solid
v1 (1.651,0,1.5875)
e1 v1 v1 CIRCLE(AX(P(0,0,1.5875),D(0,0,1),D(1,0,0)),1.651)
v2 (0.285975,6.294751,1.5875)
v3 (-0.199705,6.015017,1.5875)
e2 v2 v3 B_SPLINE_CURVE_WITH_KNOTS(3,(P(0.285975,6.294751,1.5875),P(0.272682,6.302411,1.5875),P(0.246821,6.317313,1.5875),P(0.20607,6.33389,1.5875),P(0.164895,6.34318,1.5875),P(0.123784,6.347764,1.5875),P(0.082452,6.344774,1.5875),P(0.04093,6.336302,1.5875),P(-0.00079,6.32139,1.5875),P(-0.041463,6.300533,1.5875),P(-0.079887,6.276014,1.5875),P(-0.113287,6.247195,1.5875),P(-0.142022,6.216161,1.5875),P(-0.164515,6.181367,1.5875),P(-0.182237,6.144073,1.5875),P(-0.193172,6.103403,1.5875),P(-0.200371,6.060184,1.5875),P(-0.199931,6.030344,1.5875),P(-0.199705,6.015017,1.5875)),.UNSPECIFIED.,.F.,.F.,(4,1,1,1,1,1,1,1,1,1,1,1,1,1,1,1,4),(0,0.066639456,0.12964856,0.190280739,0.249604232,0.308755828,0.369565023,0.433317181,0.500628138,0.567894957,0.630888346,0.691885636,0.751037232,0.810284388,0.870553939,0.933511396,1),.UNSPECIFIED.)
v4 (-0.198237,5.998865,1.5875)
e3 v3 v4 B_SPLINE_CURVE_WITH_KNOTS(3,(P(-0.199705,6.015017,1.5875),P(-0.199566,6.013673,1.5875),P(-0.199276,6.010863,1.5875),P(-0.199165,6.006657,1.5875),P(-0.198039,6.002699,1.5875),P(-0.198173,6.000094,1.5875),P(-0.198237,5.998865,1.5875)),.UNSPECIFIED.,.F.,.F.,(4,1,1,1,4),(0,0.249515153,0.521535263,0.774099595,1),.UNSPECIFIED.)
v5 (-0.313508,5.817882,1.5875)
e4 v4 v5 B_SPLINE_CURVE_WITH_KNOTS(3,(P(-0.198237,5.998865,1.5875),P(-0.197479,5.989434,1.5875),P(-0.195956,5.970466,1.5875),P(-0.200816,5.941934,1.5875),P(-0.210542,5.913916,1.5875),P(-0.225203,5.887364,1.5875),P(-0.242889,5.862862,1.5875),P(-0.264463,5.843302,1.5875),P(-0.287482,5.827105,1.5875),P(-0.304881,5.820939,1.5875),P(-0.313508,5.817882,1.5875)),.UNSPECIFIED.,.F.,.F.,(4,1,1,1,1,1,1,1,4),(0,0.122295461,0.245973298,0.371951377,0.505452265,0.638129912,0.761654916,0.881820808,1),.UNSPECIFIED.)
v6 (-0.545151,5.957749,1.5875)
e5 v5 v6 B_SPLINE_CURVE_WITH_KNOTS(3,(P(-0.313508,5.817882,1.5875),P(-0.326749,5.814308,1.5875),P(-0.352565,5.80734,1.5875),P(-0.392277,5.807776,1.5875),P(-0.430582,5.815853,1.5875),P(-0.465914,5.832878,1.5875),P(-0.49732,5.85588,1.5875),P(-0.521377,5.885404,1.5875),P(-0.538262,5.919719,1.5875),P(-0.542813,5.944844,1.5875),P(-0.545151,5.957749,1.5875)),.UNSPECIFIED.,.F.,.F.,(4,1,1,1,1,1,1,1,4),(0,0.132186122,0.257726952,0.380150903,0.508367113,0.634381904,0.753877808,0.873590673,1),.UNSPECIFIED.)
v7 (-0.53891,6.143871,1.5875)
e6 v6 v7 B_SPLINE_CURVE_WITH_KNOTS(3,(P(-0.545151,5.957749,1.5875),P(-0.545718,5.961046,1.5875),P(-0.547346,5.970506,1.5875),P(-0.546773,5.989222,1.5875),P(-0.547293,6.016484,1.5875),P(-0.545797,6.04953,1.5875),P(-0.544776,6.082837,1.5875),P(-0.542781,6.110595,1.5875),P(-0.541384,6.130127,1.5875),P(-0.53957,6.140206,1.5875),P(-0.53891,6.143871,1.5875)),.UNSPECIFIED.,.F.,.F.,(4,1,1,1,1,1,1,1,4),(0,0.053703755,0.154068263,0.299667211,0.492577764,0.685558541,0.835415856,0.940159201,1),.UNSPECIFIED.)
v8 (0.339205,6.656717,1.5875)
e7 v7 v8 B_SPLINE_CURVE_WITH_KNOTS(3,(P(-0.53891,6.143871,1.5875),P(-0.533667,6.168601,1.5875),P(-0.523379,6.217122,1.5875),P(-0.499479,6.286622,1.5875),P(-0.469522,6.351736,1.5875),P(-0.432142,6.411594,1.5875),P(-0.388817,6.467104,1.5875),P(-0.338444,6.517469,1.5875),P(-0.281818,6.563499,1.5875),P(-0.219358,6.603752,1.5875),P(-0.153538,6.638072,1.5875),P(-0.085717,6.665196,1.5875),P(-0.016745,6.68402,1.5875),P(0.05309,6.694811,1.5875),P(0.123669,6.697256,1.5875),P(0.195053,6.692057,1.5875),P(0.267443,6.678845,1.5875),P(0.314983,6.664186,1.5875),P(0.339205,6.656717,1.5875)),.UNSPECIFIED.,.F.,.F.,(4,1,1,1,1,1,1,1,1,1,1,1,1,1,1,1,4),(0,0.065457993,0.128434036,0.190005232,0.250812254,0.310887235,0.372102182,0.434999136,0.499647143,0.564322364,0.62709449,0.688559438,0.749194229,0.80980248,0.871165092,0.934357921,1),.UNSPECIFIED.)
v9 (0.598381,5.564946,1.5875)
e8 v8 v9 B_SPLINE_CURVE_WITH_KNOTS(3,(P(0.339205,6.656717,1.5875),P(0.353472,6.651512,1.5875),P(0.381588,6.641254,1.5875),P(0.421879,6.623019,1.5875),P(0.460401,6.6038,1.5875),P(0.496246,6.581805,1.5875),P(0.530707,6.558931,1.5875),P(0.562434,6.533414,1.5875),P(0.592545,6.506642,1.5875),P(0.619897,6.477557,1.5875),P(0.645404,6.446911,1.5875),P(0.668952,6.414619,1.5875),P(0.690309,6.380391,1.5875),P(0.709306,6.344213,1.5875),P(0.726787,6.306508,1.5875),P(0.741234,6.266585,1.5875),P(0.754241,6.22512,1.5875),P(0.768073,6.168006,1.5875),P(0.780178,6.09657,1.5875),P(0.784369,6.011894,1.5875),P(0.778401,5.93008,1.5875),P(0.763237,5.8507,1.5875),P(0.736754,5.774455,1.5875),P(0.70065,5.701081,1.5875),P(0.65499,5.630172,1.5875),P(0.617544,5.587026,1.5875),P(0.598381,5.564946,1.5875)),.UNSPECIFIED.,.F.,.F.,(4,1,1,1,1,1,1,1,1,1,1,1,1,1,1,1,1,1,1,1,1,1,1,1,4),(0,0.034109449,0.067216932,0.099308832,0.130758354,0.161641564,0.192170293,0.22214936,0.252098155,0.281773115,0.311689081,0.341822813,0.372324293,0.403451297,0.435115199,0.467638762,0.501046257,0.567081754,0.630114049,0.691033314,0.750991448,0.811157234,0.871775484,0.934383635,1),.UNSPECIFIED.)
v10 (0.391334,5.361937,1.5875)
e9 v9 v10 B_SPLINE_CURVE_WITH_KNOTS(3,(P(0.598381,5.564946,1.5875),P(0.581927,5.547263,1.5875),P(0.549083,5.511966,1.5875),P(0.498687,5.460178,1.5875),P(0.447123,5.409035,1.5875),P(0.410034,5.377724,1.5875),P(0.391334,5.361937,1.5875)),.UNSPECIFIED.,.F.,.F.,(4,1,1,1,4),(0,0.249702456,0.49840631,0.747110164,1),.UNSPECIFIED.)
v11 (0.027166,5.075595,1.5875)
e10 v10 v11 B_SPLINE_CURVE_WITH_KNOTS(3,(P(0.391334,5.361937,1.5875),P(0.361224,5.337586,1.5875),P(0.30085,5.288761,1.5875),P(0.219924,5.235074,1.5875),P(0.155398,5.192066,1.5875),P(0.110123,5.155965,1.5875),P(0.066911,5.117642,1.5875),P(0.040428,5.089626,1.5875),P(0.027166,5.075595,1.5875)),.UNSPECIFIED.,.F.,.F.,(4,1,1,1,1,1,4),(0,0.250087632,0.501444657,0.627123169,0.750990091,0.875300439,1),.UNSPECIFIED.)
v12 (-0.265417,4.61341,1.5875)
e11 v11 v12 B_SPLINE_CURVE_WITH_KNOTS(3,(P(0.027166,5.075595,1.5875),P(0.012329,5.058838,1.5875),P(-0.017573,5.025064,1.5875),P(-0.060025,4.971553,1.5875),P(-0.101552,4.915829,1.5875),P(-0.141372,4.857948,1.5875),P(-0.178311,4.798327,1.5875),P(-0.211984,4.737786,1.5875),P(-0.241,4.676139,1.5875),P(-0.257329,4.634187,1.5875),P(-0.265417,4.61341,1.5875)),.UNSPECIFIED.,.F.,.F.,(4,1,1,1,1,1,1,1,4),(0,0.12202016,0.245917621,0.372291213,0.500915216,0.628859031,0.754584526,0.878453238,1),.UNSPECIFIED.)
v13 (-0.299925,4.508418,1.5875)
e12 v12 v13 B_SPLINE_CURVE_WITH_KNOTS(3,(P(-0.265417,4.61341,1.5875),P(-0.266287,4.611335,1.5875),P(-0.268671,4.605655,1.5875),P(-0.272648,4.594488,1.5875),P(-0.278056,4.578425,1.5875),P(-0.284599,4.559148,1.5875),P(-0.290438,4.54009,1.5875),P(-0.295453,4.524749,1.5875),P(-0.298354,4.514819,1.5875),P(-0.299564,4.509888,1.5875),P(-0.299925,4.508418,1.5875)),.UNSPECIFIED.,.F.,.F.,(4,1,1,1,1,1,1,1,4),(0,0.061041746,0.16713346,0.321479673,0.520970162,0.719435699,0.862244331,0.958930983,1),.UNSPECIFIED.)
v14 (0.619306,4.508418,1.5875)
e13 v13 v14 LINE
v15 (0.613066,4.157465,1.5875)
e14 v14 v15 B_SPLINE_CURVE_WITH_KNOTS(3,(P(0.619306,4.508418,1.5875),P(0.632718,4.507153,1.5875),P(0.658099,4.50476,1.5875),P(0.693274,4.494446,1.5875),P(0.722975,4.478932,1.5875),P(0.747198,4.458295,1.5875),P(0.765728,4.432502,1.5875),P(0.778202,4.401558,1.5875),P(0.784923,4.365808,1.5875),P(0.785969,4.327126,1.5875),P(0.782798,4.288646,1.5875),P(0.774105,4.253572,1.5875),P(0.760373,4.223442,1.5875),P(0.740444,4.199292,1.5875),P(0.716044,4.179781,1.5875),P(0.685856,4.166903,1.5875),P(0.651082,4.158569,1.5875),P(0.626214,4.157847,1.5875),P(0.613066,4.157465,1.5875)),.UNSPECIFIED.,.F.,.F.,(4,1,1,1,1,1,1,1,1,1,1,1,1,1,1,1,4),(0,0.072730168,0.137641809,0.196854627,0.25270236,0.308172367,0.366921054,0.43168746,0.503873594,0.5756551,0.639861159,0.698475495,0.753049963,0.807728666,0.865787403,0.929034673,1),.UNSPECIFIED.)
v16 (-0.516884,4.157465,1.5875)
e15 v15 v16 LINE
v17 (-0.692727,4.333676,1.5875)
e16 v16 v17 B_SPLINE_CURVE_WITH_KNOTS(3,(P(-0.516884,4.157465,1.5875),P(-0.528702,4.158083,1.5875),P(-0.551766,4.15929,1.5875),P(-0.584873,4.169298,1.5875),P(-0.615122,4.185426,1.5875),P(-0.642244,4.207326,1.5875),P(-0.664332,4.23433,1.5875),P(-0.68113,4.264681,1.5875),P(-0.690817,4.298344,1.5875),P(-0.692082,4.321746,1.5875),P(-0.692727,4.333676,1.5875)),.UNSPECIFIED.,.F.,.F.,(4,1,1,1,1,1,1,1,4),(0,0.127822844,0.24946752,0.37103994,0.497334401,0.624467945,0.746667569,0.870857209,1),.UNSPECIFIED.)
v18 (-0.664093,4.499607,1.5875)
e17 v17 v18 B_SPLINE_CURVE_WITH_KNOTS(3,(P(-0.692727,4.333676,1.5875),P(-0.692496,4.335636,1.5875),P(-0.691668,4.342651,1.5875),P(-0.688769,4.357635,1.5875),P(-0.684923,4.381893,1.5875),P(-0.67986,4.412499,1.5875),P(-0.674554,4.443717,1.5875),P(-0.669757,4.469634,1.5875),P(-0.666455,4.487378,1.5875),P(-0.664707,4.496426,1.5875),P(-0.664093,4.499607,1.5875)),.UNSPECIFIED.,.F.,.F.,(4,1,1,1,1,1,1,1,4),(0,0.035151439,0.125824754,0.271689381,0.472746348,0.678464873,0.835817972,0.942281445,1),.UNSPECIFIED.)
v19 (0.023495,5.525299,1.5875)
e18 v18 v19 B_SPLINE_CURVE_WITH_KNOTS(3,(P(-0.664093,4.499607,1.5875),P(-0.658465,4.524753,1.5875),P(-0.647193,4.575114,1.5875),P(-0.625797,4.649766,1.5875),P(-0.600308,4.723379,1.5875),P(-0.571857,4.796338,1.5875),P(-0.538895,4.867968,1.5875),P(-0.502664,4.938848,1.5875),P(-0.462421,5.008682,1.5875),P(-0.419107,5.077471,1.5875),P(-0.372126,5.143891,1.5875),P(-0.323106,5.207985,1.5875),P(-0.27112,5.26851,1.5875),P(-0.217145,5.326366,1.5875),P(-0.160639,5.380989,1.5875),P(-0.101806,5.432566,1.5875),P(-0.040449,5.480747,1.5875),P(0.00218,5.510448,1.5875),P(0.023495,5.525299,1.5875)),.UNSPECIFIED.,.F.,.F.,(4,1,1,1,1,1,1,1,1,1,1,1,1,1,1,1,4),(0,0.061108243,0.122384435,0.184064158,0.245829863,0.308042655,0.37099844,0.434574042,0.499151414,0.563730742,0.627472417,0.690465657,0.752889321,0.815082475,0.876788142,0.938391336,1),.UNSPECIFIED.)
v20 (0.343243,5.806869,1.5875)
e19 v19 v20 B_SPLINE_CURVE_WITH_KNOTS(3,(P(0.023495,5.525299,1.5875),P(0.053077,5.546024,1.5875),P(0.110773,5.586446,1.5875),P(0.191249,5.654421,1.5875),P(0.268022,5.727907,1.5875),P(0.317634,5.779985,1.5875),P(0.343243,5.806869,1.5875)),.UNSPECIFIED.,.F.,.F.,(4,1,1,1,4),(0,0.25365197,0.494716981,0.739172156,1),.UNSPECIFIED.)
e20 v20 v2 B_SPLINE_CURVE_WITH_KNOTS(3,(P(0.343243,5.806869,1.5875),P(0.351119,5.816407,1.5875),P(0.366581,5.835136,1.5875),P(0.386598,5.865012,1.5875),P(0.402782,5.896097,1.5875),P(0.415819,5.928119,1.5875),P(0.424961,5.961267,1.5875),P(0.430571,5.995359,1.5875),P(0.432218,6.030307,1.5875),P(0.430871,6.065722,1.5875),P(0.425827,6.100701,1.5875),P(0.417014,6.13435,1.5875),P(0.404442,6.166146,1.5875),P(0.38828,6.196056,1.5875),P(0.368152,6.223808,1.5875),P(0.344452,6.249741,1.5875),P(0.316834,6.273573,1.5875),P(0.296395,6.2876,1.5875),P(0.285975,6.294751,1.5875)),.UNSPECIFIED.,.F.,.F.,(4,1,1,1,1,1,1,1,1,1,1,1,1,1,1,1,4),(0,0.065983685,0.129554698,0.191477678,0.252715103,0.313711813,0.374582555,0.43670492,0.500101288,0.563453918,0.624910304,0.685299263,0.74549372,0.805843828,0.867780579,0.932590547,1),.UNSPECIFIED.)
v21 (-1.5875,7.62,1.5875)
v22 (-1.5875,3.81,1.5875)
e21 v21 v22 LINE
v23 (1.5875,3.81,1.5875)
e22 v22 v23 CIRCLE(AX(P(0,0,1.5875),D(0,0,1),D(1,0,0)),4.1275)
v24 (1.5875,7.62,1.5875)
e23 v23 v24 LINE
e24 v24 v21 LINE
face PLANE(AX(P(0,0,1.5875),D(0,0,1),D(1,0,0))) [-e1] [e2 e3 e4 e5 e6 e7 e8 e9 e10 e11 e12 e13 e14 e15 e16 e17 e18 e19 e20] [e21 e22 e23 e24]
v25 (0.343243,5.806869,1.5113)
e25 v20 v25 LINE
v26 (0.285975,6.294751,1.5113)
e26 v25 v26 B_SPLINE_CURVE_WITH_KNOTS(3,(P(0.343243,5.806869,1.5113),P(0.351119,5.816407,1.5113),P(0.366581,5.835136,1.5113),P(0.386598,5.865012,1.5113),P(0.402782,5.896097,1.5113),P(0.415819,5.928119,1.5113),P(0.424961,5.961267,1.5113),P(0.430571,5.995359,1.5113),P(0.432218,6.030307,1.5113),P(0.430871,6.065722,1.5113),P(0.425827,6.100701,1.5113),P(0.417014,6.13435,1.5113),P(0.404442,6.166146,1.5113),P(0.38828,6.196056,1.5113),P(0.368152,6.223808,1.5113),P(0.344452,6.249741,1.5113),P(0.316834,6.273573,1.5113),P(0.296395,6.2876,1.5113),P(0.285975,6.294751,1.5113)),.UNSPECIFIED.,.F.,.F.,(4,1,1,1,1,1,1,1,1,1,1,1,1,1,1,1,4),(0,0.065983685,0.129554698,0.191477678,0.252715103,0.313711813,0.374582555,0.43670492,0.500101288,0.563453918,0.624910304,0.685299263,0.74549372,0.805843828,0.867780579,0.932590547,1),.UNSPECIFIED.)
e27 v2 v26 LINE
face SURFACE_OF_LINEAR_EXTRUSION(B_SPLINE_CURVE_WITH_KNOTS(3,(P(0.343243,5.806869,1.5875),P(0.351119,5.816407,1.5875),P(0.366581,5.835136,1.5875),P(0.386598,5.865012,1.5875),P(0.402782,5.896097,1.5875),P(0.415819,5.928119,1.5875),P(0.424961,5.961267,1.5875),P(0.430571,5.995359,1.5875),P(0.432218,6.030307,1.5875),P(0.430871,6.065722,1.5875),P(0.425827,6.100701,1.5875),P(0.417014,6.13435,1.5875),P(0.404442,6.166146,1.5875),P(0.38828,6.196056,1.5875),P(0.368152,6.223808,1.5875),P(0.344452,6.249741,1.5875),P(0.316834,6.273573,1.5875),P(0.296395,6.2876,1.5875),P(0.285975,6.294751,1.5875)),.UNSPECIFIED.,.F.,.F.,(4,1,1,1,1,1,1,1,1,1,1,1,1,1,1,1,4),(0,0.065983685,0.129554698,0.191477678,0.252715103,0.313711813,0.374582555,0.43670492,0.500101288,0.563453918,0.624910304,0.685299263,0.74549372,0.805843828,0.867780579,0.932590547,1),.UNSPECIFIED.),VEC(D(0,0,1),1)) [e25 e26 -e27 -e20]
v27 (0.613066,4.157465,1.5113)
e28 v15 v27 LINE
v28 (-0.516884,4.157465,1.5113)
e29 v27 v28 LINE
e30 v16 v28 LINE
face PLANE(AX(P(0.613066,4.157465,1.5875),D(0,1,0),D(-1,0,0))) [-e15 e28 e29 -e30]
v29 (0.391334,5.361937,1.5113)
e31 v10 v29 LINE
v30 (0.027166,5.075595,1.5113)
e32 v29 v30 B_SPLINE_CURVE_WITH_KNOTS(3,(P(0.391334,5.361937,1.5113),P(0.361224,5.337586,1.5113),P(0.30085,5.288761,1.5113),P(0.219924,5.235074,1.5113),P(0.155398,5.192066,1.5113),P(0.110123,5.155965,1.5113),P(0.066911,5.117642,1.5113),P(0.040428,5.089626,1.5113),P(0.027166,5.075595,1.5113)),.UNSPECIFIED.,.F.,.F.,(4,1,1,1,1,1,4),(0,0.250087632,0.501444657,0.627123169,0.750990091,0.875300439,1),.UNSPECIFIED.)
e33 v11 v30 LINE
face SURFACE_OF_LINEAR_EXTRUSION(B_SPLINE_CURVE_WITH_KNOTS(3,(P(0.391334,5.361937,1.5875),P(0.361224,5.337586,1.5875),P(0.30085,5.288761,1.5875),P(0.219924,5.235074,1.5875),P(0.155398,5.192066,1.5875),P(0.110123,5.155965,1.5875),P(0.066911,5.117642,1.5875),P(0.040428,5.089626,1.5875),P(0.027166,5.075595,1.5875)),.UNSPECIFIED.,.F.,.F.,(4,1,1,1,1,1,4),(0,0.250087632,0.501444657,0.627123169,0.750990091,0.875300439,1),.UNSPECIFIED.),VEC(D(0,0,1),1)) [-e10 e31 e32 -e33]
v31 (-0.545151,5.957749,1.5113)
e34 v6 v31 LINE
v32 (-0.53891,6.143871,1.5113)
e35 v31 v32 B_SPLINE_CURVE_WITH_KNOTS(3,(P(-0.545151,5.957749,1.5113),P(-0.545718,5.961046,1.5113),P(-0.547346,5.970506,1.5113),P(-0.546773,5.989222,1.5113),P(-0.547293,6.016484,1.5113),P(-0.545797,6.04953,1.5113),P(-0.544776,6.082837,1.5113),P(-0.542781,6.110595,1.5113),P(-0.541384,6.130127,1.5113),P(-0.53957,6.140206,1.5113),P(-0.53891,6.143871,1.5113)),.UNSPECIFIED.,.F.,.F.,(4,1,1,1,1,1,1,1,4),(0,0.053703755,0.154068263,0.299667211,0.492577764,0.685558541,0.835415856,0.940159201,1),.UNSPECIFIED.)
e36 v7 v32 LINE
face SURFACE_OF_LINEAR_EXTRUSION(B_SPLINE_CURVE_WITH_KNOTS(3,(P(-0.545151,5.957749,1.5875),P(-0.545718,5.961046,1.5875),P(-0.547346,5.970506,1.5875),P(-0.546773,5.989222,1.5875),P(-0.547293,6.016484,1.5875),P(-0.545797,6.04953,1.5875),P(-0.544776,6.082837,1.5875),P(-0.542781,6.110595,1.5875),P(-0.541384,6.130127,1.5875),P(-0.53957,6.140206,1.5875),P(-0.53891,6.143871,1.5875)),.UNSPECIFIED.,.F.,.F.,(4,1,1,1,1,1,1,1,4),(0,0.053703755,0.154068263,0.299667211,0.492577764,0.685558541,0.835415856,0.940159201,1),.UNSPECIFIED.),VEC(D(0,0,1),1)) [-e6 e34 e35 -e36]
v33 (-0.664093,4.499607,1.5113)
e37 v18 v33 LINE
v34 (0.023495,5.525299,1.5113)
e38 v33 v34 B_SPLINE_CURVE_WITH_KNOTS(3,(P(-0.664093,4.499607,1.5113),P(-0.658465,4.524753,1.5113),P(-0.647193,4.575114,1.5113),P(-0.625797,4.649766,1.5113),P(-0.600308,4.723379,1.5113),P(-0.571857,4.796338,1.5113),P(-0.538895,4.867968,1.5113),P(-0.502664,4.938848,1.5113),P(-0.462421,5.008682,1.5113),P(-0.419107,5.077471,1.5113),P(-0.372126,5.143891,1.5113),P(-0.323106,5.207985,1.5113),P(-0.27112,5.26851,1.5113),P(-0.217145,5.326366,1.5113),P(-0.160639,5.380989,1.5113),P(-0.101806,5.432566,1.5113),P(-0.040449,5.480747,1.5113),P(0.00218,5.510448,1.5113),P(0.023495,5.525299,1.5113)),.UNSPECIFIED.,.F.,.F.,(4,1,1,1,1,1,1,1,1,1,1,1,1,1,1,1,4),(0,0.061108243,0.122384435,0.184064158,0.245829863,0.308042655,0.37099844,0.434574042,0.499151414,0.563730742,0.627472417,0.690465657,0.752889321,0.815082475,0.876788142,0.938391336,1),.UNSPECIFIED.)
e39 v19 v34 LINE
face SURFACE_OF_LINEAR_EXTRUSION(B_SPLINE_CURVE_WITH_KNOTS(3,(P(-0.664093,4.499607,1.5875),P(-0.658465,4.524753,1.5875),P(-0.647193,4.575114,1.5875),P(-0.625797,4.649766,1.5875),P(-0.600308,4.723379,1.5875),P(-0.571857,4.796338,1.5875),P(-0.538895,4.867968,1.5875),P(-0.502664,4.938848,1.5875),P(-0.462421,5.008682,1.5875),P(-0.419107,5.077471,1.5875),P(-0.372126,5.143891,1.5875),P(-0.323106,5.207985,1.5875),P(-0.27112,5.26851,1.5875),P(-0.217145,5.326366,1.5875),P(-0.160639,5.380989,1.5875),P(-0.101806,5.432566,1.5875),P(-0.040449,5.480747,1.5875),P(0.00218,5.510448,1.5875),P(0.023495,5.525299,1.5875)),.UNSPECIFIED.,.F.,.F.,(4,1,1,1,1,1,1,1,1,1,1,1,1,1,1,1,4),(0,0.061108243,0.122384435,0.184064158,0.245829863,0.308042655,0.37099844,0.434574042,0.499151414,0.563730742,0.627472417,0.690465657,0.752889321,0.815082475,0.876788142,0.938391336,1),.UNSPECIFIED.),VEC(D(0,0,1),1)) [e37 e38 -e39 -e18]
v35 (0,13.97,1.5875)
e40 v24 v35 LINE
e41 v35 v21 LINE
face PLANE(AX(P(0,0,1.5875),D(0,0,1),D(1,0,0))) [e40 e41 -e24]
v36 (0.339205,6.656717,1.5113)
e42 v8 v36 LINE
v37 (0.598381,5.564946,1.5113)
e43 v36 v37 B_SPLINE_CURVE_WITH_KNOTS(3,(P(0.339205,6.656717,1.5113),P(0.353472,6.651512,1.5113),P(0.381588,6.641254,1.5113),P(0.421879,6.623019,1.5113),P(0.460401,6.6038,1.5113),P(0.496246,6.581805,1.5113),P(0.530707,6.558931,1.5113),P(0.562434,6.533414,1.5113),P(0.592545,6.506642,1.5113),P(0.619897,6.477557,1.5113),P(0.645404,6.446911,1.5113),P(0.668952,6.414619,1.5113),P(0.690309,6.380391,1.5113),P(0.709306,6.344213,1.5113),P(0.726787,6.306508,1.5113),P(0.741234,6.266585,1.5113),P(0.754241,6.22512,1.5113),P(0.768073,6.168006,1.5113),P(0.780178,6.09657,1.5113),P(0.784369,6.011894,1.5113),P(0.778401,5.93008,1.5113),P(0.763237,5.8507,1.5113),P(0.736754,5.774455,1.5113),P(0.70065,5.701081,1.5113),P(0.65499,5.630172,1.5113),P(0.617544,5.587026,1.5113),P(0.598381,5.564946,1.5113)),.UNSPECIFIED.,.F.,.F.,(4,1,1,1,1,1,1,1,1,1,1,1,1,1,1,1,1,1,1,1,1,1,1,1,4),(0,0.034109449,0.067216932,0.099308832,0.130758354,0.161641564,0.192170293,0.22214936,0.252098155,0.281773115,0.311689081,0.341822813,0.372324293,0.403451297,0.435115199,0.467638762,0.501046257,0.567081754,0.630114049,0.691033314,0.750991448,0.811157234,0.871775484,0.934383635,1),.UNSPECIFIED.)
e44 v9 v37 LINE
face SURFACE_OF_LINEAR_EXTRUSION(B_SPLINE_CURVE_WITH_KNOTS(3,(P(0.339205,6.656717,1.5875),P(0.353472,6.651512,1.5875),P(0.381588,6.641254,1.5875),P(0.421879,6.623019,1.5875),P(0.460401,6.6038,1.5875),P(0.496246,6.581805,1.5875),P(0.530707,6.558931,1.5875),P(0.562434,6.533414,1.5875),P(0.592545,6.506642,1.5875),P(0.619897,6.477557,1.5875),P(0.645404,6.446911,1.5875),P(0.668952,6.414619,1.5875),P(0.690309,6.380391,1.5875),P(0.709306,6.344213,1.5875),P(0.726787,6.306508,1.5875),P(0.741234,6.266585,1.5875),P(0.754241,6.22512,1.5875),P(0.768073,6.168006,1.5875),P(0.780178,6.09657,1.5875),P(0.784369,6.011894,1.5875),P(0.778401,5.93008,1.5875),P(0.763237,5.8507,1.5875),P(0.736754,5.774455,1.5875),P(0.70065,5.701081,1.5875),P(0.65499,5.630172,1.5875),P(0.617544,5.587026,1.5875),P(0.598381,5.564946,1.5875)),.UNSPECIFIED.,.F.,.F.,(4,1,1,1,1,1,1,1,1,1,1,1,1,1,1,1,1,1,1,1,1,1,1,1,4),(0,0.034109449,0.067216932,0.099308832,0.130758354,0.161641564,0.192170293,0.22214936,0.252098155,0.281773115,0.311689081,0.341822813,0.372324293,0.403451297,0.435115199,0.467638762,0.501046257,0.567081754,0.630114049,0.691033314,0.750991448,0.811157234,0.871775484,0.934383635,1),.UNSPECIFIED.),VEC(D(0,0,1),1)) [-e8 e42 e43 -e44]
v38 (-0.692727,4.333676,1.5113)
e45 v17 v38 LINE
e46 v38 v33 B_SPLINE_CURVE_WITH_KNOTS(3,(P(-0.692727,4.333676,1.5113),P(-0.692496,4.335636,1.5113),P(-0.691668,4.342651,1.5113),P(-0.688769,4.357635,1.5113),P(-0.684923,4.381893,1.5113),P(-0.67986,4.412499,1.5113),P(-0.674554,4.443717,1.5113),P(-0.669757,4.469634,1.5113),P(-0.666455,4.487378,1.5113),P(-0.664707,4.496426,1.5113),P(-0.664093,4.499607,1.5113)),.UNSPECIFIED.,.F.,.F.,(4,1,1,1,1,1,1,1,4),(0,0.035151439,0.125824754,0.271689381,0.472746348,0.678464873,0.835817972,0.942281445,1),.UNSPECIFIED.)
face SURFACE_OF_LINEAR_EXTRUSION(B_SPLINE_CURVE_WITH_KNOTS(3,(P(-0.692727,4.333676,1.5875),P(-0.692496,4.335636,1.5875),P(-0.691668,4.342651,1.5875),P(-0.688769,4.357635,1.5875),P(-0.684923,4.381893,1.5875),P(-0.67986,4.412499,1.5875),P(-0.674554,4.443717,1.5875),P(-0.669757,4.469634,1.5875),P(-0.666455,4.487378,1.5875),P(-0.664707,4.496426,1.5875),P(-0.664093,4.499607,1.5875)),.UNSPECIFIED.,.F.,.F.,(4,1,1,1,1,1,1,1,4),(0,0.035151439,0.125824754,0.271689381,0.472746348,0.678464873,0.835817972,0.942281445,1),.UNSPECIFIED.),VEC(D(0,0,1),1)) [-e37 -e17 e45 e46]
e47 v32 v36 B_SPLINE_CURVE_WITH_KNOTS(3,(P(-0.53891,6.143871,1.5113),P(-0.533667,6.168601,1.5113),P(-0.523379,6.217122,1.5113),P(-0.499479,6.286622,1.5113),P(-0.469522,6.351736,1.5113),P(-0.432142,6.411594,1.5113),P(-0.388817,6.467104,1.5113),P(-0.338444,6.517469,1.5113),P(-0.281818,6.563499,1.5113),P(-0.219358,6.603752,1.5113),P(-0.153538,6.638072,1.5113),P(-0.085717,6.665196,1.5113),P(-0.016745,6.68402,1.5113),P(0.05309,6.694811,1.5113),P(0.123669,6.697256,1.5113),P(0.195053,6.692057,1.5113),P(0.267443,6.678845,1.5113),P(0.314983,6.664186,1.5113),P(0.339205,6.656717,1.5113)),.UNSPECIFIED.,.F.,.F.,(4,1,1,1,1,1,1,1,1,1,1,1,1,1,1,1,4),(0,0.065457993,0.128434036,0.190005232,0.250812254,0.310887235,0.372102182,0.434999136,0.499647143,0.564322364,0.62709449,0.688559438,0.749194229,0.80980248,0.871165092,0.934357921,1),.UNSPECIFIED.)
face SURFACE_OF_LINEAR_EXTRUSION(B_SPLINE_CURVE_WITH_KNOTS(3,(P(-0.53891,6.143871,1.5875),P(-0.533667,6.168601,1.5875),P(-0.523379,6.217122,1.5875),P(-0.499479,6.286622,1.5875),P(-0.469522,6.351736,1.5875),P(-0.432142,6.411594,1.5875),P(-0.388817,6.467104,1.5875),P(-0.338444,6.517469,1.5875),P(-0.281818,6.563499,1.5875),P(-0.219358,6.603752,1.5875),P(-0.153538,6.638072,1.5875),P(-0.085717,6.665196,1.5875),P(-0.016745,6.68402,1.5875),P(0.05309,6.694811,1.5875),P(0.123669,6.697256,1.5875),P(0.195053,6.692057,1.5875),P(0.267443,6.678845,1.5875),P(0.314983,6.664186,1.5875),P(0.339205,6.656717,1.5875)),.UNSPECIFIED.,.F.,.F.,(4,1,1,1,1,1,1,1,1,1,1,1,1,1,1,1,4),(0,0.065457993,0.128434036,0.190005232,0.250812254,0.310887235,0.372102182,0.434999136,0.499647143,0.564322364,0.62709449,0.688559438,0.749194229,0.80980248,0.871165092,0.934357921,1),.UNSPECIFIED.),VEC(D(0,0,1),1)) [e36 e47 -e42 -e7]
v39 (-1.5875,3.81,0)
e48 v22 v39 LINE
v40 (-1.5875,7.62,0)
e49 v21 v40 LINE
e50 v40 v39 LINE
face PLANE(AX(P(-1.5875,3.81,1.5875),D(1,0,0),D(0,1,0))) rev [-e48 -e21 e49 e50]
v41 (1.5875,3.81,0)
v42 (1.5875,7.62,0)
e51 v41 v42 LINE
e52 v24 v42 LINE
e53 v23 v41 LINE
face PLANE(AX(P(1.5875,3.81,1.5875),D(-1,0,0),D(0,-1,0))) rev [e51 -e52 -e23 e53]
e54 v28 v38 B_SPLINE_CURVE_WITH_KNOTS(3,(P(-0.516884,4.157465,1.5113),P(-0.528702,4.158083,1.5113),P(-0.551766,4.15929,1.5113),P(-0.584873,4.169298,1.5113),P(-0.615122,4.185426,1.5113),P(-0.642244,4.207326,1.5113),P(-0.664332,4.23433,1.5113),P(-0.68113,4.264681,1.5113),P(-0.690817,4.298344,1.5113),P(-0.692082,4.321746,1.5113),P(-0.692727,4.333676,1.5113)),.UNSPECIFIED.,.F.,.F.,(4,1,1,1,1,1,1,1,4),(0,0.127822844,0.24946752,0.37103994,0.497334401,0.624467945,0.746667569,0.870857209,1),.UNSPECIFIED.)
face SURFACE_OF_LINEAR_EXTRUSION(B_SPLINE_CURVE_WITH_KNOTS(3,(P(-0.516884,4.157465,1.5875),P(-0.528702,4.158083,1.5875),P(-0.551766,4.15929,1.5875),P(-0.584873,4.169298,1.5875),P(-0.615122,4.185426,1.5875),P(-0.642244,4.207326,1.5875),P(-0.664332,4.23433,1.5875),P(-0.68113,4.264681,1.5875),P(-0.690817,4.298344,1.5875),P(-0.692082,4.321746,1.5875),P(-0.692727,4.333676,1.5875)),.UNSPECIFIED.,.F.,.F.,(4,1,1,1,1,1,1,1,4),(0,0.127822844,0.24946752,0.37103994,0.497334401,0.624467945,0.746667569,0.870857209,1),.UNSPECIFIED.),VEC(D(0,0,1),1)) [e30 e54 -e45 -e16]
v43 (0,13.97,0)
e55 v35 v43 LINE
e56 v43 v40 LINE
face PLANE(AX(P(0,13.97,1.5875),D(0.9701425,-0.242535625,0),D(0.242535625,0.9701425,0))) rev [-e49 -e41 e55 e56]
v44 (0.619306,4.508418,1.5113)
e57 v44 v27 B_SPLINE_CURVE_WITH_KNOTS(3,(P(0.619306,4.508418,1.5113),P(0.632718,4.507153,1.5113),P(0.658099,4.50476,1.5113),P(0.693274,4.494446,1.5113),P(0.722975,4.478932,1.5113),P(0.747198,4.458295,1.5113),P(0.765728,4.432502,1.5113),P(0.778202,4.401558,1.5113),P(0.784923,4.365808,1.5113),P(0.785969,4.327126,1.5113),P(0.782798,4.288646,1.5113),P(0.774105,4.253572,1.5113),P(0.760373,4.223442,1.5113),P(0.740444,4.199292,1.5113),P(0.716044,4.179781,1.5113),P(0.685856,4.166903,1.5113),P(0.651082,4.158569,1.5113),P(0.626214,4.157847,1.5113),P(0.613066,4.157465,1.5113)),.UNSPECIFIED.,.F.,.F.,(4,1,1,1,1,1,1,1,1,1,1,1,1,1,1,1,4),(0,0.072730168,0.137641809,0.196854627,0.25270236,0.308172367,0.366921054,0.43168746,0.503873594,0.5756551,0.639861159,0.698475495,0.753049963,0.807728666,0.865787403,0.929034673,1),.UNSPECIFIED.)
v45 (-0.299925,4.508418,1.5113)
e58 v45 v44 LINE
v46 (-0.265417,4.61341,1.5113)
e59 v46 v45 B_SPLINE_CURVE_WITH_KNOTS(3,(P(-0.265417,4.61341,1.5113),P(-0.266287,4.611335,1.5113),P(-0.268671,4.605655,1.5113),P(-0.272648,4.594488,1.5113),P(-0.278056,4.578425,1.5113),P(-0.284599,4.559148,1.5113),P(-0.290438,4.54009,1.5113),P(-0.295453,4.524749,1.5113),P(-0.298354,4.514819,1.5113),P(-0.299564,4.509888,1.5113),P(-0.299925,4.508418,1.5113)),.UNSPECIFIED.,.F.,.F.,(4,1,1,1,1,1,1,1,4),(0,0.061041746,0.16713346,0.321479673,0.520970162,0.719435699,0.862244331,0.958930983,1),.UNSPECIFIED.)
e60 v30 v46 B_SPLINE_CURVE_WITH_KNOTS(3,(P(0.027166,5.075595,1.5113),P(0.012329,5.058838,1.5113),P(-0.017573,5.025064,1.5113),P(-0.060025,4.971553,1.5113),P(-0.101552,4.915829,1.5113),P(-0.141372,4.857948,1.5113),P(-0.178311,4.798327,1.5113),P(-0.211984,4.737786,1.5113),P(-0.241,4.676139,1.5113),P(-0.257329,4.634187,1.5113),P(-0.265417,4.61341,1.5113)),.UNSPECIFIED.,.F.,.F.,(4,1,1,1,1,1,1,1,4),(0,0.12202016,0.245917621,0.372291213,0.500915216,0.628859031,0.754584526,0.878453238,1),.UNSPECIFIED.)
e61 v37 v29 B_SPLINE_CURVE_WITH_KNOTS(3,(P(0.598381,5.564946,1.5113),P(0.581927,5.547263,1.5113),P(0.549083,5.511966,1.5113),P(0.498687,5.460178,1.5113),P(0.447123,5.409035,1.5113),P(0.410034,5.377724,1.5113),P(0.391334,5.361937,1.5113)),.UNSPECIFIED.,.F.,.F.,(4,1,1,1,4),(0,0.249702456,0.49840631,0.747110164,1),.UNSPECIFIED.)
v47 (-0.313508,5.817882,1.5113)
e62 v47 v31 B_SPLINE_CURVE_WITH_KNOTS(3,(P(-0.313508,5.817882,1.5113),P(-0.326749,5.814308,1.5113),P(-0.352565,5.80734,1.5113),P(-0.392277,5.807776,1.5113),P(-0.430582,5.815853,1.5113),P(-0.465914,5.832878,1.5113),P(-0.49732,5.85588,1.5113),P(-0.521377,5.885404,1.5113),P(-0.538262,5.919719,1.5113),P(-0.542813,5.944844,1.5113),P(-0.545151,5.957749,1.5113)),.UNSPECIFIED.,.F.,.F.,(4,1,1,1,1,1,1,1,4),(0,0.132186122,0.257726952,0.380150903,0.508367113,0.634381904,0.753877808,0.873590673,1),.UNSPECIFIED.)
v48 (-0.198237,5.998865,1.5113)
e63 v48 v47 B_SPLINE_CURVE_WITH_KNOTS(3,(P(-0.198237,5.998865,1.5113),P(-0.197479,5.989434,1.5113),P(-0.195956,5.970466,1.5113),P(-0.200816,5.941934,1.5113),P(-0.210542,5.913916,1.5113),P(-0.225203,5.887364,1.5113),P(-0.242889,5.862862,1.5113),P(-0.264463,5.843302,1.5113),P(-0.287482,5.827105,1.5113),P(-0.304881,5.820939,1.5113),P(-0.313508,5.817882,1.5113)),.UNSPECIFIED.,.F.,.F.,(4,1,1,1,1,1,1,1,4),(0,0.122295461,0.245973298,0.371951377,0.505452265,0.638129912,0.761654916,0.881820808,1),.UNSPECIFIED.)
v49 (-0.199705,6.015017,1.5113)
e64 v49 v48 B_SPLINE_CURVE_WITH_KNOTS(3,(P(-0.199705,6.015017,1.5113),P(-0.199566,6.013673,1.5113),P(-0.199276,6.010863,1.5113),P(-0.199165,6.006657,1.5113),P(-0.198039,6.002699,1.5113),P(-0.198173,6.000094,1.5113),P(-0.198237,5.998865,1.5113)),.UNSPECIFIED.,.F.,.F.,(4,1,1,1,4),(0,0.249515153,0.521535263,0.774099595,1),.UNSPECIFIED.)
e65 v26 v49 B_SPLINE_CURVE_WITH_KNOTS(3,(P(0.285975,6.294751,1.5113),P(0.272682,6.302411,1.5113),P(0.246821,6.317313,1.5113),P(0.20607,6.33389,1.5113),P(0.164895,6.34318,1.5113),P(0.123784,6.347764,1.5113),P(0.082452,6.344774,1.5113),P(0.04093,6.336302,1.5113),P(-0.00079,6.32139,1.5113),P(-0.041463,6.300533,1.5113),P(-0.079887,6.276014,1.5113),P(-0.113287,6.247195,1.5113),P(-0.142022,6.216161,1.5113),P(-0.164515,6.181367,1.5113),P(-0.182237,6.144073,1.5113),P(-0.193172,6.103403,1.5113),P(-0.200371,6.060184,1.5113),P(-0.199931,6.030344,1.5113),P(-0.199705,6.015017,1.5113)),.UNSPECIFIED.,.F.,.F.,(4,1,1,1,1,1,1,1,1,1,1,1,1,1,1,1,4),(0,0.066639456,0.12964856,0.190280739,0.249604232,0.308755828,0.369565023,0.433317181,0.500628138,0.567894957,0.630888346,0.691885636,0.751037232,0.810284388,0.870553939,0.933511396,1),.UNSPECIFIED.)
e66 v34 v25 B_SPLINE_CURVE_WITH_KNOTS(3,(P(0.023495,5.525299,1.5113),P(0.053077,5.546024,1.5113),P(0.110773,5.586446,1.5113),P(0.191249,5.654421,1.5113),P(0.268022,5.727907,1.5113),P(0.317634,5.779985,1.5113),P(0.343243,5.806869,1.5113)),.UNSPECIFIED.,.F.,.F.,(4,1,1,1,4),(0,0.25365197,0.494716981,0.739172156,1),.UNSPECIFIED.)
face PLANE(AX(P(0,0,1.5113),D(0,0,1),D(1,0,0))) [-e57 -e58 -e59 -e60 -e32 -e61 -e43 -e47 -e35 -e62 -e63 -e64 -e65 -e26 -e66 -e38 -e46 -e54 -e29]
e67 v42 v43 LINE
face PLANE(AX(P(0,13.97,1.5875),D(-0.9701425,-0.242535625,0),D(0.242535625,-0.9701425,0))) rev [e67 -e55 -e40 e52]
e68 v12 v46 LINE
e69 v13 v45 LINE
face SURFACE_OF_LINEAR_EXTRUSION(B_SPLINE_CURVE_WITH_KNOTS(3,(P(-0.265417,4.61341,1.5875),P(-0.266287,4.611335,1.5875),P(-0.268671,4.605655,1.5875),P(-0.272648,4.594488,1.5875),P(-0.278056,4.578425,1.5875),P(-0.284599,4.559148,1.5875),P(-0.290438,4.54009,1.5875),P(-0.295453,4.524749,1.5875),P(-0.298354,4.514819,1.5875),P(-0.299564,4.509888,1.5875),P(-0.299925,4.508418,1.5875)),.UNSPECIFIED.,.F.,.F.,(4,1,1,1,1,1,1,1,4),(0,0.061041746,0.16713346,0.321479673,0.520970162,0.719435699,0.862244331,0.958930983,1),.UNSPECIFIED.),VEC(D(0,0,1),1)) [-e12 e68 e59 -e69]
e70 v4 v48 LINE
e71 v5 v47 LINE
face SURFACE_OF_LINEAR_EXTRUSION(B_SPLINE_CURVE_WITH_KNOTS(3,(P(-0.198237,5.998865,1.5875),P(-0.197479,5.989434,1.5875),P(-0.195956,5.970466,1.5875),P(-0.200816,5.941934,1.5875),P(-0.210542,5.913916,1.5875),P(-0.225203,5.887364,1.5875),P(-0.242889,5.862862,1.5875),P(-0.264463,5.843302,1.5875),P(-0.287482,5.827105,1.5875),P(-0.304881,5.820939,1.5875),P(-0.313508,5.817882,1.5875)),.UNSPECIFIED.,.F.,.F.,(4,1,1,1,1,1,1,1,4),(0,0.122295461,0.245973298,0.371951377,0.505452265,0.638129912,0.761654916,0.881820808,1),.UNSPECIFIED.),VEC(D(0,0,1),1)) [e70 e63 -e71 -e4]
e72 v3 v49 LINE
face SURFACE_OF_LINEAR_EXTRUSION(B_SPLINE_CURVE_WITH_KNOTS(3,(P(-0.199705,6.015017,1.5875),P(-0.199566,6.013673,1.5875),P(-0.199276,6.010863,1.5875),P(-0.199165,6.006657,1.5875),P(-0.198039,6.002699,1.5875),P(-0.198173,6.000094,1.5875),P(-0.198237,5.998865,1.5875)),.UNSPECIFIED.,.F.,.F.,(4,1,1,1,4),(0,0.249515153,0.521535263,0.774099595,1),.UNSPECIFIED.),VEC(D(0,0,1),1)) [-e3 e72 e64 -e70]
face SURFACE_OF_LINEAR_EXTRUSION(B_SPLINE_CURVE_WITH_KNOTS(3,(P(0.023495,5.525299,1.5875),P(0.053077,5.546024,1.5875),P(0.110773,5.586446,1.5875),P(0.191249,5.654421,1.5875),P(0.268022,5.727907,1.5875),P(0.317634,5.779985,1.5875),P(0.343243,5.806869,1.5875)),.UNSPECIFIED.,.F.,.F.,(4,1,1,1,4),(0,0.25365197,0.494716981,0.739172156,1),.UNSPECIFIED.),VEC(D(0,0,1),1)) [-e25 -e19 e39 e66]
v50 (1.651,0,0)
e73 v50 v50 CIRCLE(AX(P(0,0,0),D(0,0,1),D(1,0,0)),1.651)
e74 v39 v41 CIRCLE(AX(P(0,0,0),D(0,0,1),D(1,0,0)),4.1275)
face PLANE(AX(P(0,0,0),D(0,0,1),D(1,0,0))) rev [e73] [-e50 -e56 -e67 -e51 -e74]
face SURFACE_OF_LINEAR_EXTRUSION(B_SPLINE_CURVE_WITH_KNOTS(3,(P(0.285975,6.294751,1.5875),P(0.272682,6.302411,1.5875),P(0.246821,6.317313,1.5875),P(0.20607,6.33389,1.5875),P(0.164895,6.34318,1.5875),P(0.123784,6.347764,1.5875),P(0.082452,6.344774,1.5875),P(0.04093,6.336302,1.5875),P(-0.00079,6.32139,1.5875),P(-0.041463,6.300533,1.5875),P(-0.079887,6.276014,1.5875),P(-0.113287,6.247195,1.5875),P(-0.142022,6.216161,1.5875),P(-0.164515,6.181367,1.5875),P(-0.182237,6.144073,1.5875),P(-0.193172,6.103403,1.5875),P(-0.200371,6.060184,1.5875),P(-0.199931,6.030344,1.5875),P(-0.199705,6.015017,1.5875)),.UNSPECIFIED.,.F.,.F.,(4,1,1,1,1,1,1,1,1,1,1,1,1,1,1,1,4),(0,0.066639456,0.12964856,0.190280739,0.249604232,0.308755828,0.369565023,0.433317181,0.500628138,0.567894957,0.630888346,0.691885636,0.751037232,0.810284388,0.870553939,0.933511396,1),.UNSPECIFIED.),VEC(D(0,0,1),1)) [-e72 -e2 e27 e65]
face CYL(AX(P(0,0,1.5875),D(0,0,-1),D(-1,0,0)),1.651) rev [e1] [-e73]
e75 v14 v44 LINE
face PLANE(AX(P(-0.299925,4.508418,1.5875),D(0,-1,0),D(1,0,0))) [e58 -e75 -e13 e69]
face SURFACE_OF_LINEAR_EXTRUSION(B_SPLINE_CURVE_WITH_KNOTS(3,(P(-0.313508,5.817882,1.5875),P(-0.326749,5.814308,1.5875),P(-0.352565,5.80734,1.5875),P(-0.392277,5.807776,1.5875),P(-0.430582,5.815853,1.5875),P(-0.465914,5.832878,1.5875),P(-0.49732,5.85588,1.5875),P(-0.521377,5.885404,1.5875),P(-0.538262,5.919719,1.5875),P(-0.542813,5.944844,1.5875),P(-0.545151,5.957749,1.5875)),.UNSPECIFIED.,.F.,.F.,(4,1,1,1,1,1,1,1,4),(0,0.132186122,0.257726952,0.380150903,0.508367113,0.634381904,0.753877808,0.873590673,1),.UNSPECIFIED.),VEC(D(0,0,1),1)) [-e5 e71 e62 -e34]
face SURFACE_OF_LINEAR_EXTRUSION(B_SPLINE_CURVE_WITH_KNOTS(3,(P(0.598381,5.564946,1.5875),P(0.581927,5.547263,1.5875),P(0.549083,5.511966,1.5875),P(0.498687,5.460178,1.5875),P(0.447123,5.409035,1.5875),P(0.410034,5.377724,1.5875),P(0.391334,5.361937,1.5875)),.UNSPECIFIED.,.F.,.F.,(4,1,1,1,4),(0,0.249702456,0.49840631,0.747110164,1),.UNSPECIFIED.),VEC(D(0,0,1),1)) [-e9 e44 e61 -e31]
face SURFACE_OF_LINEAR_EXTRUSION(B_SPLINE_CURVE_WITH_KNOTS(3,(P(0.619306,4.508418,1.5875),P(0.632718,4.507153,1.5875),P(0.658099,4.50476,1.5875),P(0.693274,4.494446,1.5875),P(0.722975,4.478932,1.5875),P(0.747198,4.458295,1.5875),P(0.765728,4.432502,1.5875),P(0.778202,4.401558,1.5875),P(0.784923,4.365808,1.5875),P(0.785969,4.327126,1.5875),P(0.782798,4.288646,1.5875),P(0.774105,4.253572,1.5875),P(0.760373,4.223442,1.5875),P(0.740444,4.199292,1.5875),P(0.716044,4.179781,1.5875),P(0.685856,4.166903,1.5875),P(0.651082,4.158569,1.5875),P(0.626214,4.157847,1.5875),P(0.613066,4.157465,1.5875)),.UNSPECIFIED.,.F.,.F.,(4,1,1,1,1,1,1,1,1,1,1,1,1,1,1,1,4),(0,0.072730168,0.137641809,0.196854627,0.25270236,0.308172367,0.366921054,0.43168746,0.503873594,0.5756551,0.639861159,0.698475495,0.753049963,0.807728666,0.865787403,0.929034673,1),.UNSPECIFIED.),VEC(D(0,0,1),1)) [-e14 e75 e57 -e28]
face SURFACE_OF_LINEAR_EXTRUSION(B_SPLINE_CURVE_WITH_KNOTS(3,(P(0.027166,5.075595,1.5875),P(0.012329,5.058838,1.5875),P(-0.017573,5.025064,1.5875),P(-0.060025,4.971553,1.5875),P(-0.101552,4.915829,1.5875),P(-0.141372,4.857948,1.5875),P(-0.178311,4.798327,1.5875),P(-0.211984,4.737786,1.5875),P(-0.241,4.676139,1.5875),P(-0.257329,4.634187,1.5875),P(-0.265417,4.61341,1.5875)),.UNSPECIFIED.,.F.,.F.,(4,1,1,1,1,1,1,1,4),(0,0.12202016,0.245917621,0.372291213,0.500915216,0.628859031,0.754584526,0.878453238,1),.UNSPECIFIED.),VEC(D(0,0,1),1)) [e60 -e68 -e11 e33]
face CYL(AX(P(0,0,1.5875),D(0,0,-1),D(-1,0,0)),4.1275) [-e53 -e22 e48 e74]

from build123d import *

# Parameters (mm, degrees)
SKETCH1_R           = 1.651
BOSS_EXTRUDE1_DEPTH = 1.5875
WRAP1_START         = -0.0762
WRAP1_DEPTH         = 0.0762


# Read off the part's stored shape, not the designer's step: Wrap1
with BuildPart() as part:
    # Sketch1 → Boss-Extrude1 (new body)
    with BuildSketch(Plane.XY):
        with BuildLine():
            Line((1.5875, 3.81), (1.5875, 7.62))
            Line((1.5875, 7.62), (0, 13.97))
            Line((0, 13.97), (-1.5875, 7.62))
            Line((-1.5875, 7.62), (-1.5875, 3.81))
            ThreePointArc((-1.5875, 3.81), (0, -4.1275), (1.5875, 3.81))
        make_face()
        Circle(SKETCH1_R, mode=Mode.SUBTRACT)
    extrude(amount=BOSS_EXTRUDE1_DEPTH)

    # Wrap1 outline → Wrap1 (cut)
    with BuildSketch(Plane.XY.offset(1.5875).offset(WRAP1_START)):
        with BuildLine():
            add(Edge.make_bspline(
                [(-0.6927271, 4.333675895), (-0.692495741, 4.33563577), (-0.691667591, 4.342651153), (-0.688769042, 4.357634786), (-0.684922586, 4.381892615), (-0.67986008, 4.412498716), (-0.674554045, 4.443717389), (-0.669757497, 4.46963377), (-0.666454834, 4.487377562), (-0.664707266, 4.496426288), (-0.664092904, 4.499607388)],
                knots=[0, 0, 0, 0, 0.035151439, 0.125824754, 0.271689381, 0.472746348, 0.678464873, 0.835817972, 0.942281445, 1, 1, 1, 1], degree=3))
            add(Edge.make_bspline(
                [(-0.51688377, 4.15746546), (-0.528701611, 4.158083472), (-0.551766092, 4.159289625), (-0.584872692, 4.169297645), (-0.615121792, 4.185426226), (-0.642244185, 4.207325789), (-0.664332359, 4.234330011), (-0.681129984, 4.264680596), (-0.690817492, 4.298344301), (-0.69208232, 4.321746179), (-0.6927271, 4.333675895)],
                knots=[0, 0, 0, 0, 0.127822844, 0.24946752, 0.37103994, 0.497334401, 0.624467945, 0.746667569, 0.870857209, 1, 1, 1, 1], degree=3))
            Line((-0.51688377, 4.15746546), (0.613065645, 4.15746546))
            add(Edge.make_bspline(
                [(0.619306431, 4.50841791), (0.632717748, 4.507153173), (0.658098658, 4.50475966), (0.693273978, 4.494445608), (0.722975165, 4.478932226), (0.747198284, 4.458294651), (0.765727881, 4.432501536), (0.778201608, 4.401557742), (0.784922795, 4.365808024), (0.785968558, 4.327125755), (0.782797594, 4.288646449), (0.774105079, 4.253571852), (0.760372999, 4.223441901), (0.740443682, 4.199291643), (0.716043821, 4.179781436), (0.685855522, 4.166902638), (0.65108202, 4.158569199), (0.62621445, 4.157847212), (0.613065645, 4.15746546)],
                knots=[0, 0, 0, 0, 0.072730168, 0.137641809, 0.196854627, 0.25270236, 0.308172367, 0.366921054, 0.43168746, 0.503873594, 0.5756551, 0.639861159, 0.698475495, 0.753049963, 0.807728666, 0.865787403, 0.929034673, 1, 1, 1, 1], degree=3))
            Line((0.619306431, 4.50841791), (-0.299924672, 4.50841791))
            add(Edge.make_bspline(
                [(-0.265416795, 4.61340996), (-0.266287441, 4.611335244), (-0.268671287, 4.605654632), (-0.272648022, 4.594488112), (-0.278056178, 4.578425355), (-0.284599105, 4.559148006), (-0.290437621, 4.540090467), (-0.295453112, 4.524748532), (-0.298353833, 4.514818948), (-0.299563911, 4.509887977), (-0.299924672, 4.50841791)],
                knots=[0, 0, 0, 0, 0.061041746, 0.16713346, 0.321479673, 0.520970162, 0.719435699, 0.862244331, 0.958930983, 1, 1, 1, 1], degree=3))
            add(Edge.make_bspline(
                [(0.027165948, 5.075595247), (0.012329066, 5.058837564), (-0.017572968, 5.025064378), (-0.06002472, 4.971553167), (-0.101552202, 4.915829097), (-0.141371923, 4.857947546), (-0.178311252, 4.798326659), (-0.211983981, 4.737785905), (-0.241000061, 4.676139025), (-0.257329382, 4.634187343), (-0.265416795, 4.61340996)],
                knots=[0, 0, 0, 0, 0.12202016, 0.245917621, 0.372291213, 0.500915216, 0.628859031, 0.754584526, 0.878453238, 1, 1, 1, 1], degree=3))
            add(Edge.make_bspline(
                [(0.391334181, 5.361937204), (0.361223865, 5.337586417), (0.300850401, 5.288761242), (0.219924135, 5.235074247), (0.155397551, 5.192066323), (0.110122794, 5.155965467), (0.066910538, 5.117642292), (0.040427943, 5.089625526), (0.027165948, 5.075595247)],
                knots=[0, 0, 0, 0, 0.250087632, 0.501444657, 0.627123169, 0.750990091, 0.875300439, 1, 1, 1, 1], degree=3))
            add(Edge.make_bspline(
                [(0.598381442, 5.56494631), (0.581926642, 5.547262699), (0.549082849, 5.511966198), (0.49868679, 5.460177761), (0.447122843, 5.409034831), (0.410033576, 5.377723514), (0.391334181, 5.361937204)],
                knots=[0, 0, 0, 0, 0.249702456, 0.49840631, 0.747110164, 1, 1, 1, 1], degree=3))
            add(Edge.make_bspline(
                [(0.33920526, 6.656716797), (0.353472465, 6.651511564), (0.381587775, 6.641254003), (0.421878928, 6.623018524), (0.46040127, 6.60379966), (0.496246373, 6.581804576), (0.530707302, 6.55893057), (0.562434404, 6.533414044), (0.592544673, 6.506642148), (0.619896671, 6.477556983), (0.645403722, 6.446910926), (0.668952012, 6.414618565), (0.690309115, 6.380391375), (0.709306159, 6.344213139), (0.726787061, 6.306508462), (0.741234339, 6.266585002), (0.754241409, 6.22511982), (0.768072724, 6.168006218), (0.780178454, 6.096569678), (0.784368607, 6.011894186), (0.778401012, 5.930079625), (0.763237068, 5.850700165), (0.736754159, 5.774454593), (0.700650258, 5.70108113), (0.65499011, 5.630171698), (0.617543834, 5.587025516), (0.598381442, 5.56494631)],
                knots=[0, 0, 0, 0, 0.034109449, 0.067216932, 0.099308832, 0.130758354, 0.161641564, 0.192170293, 0.22214936, 0.252098155, 0.281773115, 0.311689081, 0.341822813, 0.372324293, 0.403451297, 0.435115199, 0.467638762, 0.501046257, 0.567081754, 0.630114049, 0.691033314, 0.750991448, 0.811157234, 0.871775484, 0.934383635, 1, 1, 1, 1], degree=3))
            add(Edge.make_bspline(
                [(-0.538910074, 6.14387101), (-0.533666781, 6.168600667), (-0.523379004, 6.217122316), (-0.49947922, 6.286622214), (-0.46952229, 6.351736346), (-0.432141963, 6.411594101), (-0.388817022, 6.467103624), (-0.338443531, 6.517468922), (-0.281818221, 6.563499117), (-0.219357577, 6.603751762), (-0.153537671, 6.638071584), (-0.085716569, 6.665195555), (-0.016745257, 6.684019917), (0.053090433, 6.694810558), (0.123668827, 6.69725602), (0.195052802, 6.69205738), (0.26744334, 6.678845403), (0.314983363, 6.664185895), (0.33920526, 6.656716797)],
                knots=[0, 0, 0, 0, 0.065457993, 0.128434036, 0.190005232, 0.250812254, 0.310887235, 0.372102182, 0.434999136, 0.499647143, 0.564322364, 0.62709449, 0.688559438, 0.749194229, 0.80980248, 0.871165092, 0.934357921, 1, 1, 1, 1], degree=3))
            add(Edge.make_bspline(
                [(-0.54515086, 5.957748738), (-0.545718168, 5.961046078), (-0.547345693, 5.970505669), (-0.546773291, 5.989222056), (-0.547292664, 6.016483915), (-0.545797464, 6.049530152), (-0.544775877, 6.082836829), (-0.54278109, 6.110594522), (-0.541383604, 6.130127097), (-0.539569617, 6.140206325), (-0.538910074, 6.14387101)],
                knots=[0, 0, 0, 0, 0.053703755, 0.154068263, 0.299667211, 0.492577764, 0.685558541, 0.835415856, 0.940159201, 1, 1, 1, 1], degree=3))
            add(Edge.make_bspline(
                [(-0.313507559, 5.817881705), (-0.326748688, 5.814308009), (-0.352565283, 5.807340274), (-0.392277197, 5.807775651), (-0.430582168, 5.815853055), (-0.465914446, 5.832877527), (-0.497319983, 5.855880409), (-0.521377363, 5.885403501), (-0.538261794, 5.91971928), (-0.542813227, 5.944844385), (-0.54515086, 5.957748738)],
                knots=[0, 0, 0, 0, 0.132186122, 0.257726952, 0.380150903, 0.508367113, 0.634381904, 0.753877808, 0.873590673, 1, 1, 1, 1], degree=3))
            add(Edge.make_bspline(
                [(-0.198236566, 5.998864506), (-0.197479077, 5.989433957), (-0.195955535, 5.970466259), (-0.200815888, 5.941934255), (-0.210542191, 5.913916125), (-0.225203232, 5.887363551), (-0.242888924, 5.862861999), (-0.264463419, 5.843302102), (-0.287482268, 5.827105268), (-0.304880803, 5.820939094), (-0.313507559, 5.817881705)],
                knots=[0, 0, 0, 0, 0.122295461, 0.245973298, 0.371951377, 0.505452265, 0.638129912, 0.761654916, 0.881820808, 1, 1, 1, 1], degree=3))
            add(Edge.make_bspline(
                [(-0.199704987, 6.015017129), (-0.199566206, 6.013672938), (-0.199276128, 6.010863318), (-0.199164855, 6.006656873), (-0.198039254, 6.00269879), (-0.198173285, 6.000094218), (-0.198236566, 5.998864506)],
                knots=[0, 0, 0, 0, 0.249515153, 0.521535263, 0.774099595, 1, 1, 1, 1], degree=3))
            add(Edge.make_bspline(
                [(0.285975025, 6.294751195), (0.272682151, 6.302411025), (0.246820565, 6.317313396), (0.206070499, 6.333889959), (0.164895436, 6.343180125), (0.123783852, 6.347764309), (0.082451701, 6.344774208), (0.040930466, 6.336302375), (-0.000789689, 6.321390173), (-0.041463496, 6.300532784), (-0.079886926, 6.276014174), (-0.113287346, 6.247194805), (-0.142021611, 6.216160745), (-0.164514541, 6.181366891), (-0.182237478, 6.144073312), (-0.193171755, 6.103402582), (-0.200370718, 6.060183865), (-0.199930896, 6.03034404), (-0.199704987, 6.015017129)],
                knots=[0, 0, 0, 0, 0.066639456, 0.12964856, 0.190280739, 0.249604232, 0.308755828, 0.369565023, 0.433317181, 0.500628138, 0.567894957, 0.630888346, 0.691885636, 0.751037232, 0.810284388, 0.870553939, 0.933511396, 1, 1, 1, 1], degree=3))
            add(Edge.make_bspline(
                [(0.343243416, 5.806868553), (0.351118523, 5.816407152), (0.366580785, 5.835135574), (0.386597777, 5.865012057), (0.402782369, 5.896097243), (0.415819128, 5.928119207), (0.424960671, 5.961266887), (0.430570708, 5.995358807), (0.432217895, 6.030307207), (0.430871446, 6.06572163), (0.425827166, 6.10070134), (0.417013572, 6.134350041), (0.404442271, 6.166146407), (0.388279505, 6.196056065), (0.368152112, 6.223808343), (0.34445221, 6.249741409), (0.316833874, 6.273573162), (0.296395252, 6.287599927), (0.285975025, 6.294751195)],
                knots=[0, 0, 0, 0, 0.065983685, 0.129554698, 0.191477678, 0.252715103, 0.313711813, 0.374582555, 0.43670492, 0.500101288, 0.563453918, 0.624910304, 0.685299263, 0.74549372, 0.805843828, 0.867780579, 0.932590547, 1, 1, 1, 1], degree=3))
            add(Edge.make_bspline(
                [(0.023494898, 5.525298962), (0.053077007, 5.546024218), (0.110773274, 5.586446284), (0.191248753, 5.654420756), (0.268021717, 5.7279068), (0.317633659, 5.779985467), (0.343243416, 5.806868553)],
                knots=[0, 0, 0, 0, 0.25365197, 0.494716981, 0.739172156, 1, 1, 1, 1], degree=3))
            add(Edge.make_bspline(
                [(-0.664092904, 4.499607388), (-0.658464763, 4.524753093), (-0.647193012, 4.575113612), (-0.625796845, 4.649765684), (-0.600307799, 4.723379254), (-0.571857224, 4.796338257), (-0.538895385, 4.867967849), (-0.502663605, 4.938847518), (-0.462420857, 5.008682301), (-0.419106564, 5.077470685), (-0.372126214, 5.143890883), (-0.323106184, 5.207984837), (-0.27111994, 5.26850968), (-0.217145112, 5.326365759), (-0.160639031, 5.380988853), (-0.101805622, 5.43256559), (-0.040448995, 5.480747144), (0.002179636, 5.510447916), (0.023494898, 5.525298962)],
                knots=[0, 0, 0, 0, 0.061108243, 0.122384435, 0.184064158, 0.245829863, 0.308042655, 0.37099844, 0.434574042, 0.499151414, 0.563730742, 0.627472417, 0.690465657, 0.752889321, 0.815082475, 0.876788142, 0.938391336, 1, 1, 1, 1], degree=3))
        make_face()
    extrude(amount=WRAP1_DEPTH, mode=Mode.SUBTRACT)


solid = part.part
